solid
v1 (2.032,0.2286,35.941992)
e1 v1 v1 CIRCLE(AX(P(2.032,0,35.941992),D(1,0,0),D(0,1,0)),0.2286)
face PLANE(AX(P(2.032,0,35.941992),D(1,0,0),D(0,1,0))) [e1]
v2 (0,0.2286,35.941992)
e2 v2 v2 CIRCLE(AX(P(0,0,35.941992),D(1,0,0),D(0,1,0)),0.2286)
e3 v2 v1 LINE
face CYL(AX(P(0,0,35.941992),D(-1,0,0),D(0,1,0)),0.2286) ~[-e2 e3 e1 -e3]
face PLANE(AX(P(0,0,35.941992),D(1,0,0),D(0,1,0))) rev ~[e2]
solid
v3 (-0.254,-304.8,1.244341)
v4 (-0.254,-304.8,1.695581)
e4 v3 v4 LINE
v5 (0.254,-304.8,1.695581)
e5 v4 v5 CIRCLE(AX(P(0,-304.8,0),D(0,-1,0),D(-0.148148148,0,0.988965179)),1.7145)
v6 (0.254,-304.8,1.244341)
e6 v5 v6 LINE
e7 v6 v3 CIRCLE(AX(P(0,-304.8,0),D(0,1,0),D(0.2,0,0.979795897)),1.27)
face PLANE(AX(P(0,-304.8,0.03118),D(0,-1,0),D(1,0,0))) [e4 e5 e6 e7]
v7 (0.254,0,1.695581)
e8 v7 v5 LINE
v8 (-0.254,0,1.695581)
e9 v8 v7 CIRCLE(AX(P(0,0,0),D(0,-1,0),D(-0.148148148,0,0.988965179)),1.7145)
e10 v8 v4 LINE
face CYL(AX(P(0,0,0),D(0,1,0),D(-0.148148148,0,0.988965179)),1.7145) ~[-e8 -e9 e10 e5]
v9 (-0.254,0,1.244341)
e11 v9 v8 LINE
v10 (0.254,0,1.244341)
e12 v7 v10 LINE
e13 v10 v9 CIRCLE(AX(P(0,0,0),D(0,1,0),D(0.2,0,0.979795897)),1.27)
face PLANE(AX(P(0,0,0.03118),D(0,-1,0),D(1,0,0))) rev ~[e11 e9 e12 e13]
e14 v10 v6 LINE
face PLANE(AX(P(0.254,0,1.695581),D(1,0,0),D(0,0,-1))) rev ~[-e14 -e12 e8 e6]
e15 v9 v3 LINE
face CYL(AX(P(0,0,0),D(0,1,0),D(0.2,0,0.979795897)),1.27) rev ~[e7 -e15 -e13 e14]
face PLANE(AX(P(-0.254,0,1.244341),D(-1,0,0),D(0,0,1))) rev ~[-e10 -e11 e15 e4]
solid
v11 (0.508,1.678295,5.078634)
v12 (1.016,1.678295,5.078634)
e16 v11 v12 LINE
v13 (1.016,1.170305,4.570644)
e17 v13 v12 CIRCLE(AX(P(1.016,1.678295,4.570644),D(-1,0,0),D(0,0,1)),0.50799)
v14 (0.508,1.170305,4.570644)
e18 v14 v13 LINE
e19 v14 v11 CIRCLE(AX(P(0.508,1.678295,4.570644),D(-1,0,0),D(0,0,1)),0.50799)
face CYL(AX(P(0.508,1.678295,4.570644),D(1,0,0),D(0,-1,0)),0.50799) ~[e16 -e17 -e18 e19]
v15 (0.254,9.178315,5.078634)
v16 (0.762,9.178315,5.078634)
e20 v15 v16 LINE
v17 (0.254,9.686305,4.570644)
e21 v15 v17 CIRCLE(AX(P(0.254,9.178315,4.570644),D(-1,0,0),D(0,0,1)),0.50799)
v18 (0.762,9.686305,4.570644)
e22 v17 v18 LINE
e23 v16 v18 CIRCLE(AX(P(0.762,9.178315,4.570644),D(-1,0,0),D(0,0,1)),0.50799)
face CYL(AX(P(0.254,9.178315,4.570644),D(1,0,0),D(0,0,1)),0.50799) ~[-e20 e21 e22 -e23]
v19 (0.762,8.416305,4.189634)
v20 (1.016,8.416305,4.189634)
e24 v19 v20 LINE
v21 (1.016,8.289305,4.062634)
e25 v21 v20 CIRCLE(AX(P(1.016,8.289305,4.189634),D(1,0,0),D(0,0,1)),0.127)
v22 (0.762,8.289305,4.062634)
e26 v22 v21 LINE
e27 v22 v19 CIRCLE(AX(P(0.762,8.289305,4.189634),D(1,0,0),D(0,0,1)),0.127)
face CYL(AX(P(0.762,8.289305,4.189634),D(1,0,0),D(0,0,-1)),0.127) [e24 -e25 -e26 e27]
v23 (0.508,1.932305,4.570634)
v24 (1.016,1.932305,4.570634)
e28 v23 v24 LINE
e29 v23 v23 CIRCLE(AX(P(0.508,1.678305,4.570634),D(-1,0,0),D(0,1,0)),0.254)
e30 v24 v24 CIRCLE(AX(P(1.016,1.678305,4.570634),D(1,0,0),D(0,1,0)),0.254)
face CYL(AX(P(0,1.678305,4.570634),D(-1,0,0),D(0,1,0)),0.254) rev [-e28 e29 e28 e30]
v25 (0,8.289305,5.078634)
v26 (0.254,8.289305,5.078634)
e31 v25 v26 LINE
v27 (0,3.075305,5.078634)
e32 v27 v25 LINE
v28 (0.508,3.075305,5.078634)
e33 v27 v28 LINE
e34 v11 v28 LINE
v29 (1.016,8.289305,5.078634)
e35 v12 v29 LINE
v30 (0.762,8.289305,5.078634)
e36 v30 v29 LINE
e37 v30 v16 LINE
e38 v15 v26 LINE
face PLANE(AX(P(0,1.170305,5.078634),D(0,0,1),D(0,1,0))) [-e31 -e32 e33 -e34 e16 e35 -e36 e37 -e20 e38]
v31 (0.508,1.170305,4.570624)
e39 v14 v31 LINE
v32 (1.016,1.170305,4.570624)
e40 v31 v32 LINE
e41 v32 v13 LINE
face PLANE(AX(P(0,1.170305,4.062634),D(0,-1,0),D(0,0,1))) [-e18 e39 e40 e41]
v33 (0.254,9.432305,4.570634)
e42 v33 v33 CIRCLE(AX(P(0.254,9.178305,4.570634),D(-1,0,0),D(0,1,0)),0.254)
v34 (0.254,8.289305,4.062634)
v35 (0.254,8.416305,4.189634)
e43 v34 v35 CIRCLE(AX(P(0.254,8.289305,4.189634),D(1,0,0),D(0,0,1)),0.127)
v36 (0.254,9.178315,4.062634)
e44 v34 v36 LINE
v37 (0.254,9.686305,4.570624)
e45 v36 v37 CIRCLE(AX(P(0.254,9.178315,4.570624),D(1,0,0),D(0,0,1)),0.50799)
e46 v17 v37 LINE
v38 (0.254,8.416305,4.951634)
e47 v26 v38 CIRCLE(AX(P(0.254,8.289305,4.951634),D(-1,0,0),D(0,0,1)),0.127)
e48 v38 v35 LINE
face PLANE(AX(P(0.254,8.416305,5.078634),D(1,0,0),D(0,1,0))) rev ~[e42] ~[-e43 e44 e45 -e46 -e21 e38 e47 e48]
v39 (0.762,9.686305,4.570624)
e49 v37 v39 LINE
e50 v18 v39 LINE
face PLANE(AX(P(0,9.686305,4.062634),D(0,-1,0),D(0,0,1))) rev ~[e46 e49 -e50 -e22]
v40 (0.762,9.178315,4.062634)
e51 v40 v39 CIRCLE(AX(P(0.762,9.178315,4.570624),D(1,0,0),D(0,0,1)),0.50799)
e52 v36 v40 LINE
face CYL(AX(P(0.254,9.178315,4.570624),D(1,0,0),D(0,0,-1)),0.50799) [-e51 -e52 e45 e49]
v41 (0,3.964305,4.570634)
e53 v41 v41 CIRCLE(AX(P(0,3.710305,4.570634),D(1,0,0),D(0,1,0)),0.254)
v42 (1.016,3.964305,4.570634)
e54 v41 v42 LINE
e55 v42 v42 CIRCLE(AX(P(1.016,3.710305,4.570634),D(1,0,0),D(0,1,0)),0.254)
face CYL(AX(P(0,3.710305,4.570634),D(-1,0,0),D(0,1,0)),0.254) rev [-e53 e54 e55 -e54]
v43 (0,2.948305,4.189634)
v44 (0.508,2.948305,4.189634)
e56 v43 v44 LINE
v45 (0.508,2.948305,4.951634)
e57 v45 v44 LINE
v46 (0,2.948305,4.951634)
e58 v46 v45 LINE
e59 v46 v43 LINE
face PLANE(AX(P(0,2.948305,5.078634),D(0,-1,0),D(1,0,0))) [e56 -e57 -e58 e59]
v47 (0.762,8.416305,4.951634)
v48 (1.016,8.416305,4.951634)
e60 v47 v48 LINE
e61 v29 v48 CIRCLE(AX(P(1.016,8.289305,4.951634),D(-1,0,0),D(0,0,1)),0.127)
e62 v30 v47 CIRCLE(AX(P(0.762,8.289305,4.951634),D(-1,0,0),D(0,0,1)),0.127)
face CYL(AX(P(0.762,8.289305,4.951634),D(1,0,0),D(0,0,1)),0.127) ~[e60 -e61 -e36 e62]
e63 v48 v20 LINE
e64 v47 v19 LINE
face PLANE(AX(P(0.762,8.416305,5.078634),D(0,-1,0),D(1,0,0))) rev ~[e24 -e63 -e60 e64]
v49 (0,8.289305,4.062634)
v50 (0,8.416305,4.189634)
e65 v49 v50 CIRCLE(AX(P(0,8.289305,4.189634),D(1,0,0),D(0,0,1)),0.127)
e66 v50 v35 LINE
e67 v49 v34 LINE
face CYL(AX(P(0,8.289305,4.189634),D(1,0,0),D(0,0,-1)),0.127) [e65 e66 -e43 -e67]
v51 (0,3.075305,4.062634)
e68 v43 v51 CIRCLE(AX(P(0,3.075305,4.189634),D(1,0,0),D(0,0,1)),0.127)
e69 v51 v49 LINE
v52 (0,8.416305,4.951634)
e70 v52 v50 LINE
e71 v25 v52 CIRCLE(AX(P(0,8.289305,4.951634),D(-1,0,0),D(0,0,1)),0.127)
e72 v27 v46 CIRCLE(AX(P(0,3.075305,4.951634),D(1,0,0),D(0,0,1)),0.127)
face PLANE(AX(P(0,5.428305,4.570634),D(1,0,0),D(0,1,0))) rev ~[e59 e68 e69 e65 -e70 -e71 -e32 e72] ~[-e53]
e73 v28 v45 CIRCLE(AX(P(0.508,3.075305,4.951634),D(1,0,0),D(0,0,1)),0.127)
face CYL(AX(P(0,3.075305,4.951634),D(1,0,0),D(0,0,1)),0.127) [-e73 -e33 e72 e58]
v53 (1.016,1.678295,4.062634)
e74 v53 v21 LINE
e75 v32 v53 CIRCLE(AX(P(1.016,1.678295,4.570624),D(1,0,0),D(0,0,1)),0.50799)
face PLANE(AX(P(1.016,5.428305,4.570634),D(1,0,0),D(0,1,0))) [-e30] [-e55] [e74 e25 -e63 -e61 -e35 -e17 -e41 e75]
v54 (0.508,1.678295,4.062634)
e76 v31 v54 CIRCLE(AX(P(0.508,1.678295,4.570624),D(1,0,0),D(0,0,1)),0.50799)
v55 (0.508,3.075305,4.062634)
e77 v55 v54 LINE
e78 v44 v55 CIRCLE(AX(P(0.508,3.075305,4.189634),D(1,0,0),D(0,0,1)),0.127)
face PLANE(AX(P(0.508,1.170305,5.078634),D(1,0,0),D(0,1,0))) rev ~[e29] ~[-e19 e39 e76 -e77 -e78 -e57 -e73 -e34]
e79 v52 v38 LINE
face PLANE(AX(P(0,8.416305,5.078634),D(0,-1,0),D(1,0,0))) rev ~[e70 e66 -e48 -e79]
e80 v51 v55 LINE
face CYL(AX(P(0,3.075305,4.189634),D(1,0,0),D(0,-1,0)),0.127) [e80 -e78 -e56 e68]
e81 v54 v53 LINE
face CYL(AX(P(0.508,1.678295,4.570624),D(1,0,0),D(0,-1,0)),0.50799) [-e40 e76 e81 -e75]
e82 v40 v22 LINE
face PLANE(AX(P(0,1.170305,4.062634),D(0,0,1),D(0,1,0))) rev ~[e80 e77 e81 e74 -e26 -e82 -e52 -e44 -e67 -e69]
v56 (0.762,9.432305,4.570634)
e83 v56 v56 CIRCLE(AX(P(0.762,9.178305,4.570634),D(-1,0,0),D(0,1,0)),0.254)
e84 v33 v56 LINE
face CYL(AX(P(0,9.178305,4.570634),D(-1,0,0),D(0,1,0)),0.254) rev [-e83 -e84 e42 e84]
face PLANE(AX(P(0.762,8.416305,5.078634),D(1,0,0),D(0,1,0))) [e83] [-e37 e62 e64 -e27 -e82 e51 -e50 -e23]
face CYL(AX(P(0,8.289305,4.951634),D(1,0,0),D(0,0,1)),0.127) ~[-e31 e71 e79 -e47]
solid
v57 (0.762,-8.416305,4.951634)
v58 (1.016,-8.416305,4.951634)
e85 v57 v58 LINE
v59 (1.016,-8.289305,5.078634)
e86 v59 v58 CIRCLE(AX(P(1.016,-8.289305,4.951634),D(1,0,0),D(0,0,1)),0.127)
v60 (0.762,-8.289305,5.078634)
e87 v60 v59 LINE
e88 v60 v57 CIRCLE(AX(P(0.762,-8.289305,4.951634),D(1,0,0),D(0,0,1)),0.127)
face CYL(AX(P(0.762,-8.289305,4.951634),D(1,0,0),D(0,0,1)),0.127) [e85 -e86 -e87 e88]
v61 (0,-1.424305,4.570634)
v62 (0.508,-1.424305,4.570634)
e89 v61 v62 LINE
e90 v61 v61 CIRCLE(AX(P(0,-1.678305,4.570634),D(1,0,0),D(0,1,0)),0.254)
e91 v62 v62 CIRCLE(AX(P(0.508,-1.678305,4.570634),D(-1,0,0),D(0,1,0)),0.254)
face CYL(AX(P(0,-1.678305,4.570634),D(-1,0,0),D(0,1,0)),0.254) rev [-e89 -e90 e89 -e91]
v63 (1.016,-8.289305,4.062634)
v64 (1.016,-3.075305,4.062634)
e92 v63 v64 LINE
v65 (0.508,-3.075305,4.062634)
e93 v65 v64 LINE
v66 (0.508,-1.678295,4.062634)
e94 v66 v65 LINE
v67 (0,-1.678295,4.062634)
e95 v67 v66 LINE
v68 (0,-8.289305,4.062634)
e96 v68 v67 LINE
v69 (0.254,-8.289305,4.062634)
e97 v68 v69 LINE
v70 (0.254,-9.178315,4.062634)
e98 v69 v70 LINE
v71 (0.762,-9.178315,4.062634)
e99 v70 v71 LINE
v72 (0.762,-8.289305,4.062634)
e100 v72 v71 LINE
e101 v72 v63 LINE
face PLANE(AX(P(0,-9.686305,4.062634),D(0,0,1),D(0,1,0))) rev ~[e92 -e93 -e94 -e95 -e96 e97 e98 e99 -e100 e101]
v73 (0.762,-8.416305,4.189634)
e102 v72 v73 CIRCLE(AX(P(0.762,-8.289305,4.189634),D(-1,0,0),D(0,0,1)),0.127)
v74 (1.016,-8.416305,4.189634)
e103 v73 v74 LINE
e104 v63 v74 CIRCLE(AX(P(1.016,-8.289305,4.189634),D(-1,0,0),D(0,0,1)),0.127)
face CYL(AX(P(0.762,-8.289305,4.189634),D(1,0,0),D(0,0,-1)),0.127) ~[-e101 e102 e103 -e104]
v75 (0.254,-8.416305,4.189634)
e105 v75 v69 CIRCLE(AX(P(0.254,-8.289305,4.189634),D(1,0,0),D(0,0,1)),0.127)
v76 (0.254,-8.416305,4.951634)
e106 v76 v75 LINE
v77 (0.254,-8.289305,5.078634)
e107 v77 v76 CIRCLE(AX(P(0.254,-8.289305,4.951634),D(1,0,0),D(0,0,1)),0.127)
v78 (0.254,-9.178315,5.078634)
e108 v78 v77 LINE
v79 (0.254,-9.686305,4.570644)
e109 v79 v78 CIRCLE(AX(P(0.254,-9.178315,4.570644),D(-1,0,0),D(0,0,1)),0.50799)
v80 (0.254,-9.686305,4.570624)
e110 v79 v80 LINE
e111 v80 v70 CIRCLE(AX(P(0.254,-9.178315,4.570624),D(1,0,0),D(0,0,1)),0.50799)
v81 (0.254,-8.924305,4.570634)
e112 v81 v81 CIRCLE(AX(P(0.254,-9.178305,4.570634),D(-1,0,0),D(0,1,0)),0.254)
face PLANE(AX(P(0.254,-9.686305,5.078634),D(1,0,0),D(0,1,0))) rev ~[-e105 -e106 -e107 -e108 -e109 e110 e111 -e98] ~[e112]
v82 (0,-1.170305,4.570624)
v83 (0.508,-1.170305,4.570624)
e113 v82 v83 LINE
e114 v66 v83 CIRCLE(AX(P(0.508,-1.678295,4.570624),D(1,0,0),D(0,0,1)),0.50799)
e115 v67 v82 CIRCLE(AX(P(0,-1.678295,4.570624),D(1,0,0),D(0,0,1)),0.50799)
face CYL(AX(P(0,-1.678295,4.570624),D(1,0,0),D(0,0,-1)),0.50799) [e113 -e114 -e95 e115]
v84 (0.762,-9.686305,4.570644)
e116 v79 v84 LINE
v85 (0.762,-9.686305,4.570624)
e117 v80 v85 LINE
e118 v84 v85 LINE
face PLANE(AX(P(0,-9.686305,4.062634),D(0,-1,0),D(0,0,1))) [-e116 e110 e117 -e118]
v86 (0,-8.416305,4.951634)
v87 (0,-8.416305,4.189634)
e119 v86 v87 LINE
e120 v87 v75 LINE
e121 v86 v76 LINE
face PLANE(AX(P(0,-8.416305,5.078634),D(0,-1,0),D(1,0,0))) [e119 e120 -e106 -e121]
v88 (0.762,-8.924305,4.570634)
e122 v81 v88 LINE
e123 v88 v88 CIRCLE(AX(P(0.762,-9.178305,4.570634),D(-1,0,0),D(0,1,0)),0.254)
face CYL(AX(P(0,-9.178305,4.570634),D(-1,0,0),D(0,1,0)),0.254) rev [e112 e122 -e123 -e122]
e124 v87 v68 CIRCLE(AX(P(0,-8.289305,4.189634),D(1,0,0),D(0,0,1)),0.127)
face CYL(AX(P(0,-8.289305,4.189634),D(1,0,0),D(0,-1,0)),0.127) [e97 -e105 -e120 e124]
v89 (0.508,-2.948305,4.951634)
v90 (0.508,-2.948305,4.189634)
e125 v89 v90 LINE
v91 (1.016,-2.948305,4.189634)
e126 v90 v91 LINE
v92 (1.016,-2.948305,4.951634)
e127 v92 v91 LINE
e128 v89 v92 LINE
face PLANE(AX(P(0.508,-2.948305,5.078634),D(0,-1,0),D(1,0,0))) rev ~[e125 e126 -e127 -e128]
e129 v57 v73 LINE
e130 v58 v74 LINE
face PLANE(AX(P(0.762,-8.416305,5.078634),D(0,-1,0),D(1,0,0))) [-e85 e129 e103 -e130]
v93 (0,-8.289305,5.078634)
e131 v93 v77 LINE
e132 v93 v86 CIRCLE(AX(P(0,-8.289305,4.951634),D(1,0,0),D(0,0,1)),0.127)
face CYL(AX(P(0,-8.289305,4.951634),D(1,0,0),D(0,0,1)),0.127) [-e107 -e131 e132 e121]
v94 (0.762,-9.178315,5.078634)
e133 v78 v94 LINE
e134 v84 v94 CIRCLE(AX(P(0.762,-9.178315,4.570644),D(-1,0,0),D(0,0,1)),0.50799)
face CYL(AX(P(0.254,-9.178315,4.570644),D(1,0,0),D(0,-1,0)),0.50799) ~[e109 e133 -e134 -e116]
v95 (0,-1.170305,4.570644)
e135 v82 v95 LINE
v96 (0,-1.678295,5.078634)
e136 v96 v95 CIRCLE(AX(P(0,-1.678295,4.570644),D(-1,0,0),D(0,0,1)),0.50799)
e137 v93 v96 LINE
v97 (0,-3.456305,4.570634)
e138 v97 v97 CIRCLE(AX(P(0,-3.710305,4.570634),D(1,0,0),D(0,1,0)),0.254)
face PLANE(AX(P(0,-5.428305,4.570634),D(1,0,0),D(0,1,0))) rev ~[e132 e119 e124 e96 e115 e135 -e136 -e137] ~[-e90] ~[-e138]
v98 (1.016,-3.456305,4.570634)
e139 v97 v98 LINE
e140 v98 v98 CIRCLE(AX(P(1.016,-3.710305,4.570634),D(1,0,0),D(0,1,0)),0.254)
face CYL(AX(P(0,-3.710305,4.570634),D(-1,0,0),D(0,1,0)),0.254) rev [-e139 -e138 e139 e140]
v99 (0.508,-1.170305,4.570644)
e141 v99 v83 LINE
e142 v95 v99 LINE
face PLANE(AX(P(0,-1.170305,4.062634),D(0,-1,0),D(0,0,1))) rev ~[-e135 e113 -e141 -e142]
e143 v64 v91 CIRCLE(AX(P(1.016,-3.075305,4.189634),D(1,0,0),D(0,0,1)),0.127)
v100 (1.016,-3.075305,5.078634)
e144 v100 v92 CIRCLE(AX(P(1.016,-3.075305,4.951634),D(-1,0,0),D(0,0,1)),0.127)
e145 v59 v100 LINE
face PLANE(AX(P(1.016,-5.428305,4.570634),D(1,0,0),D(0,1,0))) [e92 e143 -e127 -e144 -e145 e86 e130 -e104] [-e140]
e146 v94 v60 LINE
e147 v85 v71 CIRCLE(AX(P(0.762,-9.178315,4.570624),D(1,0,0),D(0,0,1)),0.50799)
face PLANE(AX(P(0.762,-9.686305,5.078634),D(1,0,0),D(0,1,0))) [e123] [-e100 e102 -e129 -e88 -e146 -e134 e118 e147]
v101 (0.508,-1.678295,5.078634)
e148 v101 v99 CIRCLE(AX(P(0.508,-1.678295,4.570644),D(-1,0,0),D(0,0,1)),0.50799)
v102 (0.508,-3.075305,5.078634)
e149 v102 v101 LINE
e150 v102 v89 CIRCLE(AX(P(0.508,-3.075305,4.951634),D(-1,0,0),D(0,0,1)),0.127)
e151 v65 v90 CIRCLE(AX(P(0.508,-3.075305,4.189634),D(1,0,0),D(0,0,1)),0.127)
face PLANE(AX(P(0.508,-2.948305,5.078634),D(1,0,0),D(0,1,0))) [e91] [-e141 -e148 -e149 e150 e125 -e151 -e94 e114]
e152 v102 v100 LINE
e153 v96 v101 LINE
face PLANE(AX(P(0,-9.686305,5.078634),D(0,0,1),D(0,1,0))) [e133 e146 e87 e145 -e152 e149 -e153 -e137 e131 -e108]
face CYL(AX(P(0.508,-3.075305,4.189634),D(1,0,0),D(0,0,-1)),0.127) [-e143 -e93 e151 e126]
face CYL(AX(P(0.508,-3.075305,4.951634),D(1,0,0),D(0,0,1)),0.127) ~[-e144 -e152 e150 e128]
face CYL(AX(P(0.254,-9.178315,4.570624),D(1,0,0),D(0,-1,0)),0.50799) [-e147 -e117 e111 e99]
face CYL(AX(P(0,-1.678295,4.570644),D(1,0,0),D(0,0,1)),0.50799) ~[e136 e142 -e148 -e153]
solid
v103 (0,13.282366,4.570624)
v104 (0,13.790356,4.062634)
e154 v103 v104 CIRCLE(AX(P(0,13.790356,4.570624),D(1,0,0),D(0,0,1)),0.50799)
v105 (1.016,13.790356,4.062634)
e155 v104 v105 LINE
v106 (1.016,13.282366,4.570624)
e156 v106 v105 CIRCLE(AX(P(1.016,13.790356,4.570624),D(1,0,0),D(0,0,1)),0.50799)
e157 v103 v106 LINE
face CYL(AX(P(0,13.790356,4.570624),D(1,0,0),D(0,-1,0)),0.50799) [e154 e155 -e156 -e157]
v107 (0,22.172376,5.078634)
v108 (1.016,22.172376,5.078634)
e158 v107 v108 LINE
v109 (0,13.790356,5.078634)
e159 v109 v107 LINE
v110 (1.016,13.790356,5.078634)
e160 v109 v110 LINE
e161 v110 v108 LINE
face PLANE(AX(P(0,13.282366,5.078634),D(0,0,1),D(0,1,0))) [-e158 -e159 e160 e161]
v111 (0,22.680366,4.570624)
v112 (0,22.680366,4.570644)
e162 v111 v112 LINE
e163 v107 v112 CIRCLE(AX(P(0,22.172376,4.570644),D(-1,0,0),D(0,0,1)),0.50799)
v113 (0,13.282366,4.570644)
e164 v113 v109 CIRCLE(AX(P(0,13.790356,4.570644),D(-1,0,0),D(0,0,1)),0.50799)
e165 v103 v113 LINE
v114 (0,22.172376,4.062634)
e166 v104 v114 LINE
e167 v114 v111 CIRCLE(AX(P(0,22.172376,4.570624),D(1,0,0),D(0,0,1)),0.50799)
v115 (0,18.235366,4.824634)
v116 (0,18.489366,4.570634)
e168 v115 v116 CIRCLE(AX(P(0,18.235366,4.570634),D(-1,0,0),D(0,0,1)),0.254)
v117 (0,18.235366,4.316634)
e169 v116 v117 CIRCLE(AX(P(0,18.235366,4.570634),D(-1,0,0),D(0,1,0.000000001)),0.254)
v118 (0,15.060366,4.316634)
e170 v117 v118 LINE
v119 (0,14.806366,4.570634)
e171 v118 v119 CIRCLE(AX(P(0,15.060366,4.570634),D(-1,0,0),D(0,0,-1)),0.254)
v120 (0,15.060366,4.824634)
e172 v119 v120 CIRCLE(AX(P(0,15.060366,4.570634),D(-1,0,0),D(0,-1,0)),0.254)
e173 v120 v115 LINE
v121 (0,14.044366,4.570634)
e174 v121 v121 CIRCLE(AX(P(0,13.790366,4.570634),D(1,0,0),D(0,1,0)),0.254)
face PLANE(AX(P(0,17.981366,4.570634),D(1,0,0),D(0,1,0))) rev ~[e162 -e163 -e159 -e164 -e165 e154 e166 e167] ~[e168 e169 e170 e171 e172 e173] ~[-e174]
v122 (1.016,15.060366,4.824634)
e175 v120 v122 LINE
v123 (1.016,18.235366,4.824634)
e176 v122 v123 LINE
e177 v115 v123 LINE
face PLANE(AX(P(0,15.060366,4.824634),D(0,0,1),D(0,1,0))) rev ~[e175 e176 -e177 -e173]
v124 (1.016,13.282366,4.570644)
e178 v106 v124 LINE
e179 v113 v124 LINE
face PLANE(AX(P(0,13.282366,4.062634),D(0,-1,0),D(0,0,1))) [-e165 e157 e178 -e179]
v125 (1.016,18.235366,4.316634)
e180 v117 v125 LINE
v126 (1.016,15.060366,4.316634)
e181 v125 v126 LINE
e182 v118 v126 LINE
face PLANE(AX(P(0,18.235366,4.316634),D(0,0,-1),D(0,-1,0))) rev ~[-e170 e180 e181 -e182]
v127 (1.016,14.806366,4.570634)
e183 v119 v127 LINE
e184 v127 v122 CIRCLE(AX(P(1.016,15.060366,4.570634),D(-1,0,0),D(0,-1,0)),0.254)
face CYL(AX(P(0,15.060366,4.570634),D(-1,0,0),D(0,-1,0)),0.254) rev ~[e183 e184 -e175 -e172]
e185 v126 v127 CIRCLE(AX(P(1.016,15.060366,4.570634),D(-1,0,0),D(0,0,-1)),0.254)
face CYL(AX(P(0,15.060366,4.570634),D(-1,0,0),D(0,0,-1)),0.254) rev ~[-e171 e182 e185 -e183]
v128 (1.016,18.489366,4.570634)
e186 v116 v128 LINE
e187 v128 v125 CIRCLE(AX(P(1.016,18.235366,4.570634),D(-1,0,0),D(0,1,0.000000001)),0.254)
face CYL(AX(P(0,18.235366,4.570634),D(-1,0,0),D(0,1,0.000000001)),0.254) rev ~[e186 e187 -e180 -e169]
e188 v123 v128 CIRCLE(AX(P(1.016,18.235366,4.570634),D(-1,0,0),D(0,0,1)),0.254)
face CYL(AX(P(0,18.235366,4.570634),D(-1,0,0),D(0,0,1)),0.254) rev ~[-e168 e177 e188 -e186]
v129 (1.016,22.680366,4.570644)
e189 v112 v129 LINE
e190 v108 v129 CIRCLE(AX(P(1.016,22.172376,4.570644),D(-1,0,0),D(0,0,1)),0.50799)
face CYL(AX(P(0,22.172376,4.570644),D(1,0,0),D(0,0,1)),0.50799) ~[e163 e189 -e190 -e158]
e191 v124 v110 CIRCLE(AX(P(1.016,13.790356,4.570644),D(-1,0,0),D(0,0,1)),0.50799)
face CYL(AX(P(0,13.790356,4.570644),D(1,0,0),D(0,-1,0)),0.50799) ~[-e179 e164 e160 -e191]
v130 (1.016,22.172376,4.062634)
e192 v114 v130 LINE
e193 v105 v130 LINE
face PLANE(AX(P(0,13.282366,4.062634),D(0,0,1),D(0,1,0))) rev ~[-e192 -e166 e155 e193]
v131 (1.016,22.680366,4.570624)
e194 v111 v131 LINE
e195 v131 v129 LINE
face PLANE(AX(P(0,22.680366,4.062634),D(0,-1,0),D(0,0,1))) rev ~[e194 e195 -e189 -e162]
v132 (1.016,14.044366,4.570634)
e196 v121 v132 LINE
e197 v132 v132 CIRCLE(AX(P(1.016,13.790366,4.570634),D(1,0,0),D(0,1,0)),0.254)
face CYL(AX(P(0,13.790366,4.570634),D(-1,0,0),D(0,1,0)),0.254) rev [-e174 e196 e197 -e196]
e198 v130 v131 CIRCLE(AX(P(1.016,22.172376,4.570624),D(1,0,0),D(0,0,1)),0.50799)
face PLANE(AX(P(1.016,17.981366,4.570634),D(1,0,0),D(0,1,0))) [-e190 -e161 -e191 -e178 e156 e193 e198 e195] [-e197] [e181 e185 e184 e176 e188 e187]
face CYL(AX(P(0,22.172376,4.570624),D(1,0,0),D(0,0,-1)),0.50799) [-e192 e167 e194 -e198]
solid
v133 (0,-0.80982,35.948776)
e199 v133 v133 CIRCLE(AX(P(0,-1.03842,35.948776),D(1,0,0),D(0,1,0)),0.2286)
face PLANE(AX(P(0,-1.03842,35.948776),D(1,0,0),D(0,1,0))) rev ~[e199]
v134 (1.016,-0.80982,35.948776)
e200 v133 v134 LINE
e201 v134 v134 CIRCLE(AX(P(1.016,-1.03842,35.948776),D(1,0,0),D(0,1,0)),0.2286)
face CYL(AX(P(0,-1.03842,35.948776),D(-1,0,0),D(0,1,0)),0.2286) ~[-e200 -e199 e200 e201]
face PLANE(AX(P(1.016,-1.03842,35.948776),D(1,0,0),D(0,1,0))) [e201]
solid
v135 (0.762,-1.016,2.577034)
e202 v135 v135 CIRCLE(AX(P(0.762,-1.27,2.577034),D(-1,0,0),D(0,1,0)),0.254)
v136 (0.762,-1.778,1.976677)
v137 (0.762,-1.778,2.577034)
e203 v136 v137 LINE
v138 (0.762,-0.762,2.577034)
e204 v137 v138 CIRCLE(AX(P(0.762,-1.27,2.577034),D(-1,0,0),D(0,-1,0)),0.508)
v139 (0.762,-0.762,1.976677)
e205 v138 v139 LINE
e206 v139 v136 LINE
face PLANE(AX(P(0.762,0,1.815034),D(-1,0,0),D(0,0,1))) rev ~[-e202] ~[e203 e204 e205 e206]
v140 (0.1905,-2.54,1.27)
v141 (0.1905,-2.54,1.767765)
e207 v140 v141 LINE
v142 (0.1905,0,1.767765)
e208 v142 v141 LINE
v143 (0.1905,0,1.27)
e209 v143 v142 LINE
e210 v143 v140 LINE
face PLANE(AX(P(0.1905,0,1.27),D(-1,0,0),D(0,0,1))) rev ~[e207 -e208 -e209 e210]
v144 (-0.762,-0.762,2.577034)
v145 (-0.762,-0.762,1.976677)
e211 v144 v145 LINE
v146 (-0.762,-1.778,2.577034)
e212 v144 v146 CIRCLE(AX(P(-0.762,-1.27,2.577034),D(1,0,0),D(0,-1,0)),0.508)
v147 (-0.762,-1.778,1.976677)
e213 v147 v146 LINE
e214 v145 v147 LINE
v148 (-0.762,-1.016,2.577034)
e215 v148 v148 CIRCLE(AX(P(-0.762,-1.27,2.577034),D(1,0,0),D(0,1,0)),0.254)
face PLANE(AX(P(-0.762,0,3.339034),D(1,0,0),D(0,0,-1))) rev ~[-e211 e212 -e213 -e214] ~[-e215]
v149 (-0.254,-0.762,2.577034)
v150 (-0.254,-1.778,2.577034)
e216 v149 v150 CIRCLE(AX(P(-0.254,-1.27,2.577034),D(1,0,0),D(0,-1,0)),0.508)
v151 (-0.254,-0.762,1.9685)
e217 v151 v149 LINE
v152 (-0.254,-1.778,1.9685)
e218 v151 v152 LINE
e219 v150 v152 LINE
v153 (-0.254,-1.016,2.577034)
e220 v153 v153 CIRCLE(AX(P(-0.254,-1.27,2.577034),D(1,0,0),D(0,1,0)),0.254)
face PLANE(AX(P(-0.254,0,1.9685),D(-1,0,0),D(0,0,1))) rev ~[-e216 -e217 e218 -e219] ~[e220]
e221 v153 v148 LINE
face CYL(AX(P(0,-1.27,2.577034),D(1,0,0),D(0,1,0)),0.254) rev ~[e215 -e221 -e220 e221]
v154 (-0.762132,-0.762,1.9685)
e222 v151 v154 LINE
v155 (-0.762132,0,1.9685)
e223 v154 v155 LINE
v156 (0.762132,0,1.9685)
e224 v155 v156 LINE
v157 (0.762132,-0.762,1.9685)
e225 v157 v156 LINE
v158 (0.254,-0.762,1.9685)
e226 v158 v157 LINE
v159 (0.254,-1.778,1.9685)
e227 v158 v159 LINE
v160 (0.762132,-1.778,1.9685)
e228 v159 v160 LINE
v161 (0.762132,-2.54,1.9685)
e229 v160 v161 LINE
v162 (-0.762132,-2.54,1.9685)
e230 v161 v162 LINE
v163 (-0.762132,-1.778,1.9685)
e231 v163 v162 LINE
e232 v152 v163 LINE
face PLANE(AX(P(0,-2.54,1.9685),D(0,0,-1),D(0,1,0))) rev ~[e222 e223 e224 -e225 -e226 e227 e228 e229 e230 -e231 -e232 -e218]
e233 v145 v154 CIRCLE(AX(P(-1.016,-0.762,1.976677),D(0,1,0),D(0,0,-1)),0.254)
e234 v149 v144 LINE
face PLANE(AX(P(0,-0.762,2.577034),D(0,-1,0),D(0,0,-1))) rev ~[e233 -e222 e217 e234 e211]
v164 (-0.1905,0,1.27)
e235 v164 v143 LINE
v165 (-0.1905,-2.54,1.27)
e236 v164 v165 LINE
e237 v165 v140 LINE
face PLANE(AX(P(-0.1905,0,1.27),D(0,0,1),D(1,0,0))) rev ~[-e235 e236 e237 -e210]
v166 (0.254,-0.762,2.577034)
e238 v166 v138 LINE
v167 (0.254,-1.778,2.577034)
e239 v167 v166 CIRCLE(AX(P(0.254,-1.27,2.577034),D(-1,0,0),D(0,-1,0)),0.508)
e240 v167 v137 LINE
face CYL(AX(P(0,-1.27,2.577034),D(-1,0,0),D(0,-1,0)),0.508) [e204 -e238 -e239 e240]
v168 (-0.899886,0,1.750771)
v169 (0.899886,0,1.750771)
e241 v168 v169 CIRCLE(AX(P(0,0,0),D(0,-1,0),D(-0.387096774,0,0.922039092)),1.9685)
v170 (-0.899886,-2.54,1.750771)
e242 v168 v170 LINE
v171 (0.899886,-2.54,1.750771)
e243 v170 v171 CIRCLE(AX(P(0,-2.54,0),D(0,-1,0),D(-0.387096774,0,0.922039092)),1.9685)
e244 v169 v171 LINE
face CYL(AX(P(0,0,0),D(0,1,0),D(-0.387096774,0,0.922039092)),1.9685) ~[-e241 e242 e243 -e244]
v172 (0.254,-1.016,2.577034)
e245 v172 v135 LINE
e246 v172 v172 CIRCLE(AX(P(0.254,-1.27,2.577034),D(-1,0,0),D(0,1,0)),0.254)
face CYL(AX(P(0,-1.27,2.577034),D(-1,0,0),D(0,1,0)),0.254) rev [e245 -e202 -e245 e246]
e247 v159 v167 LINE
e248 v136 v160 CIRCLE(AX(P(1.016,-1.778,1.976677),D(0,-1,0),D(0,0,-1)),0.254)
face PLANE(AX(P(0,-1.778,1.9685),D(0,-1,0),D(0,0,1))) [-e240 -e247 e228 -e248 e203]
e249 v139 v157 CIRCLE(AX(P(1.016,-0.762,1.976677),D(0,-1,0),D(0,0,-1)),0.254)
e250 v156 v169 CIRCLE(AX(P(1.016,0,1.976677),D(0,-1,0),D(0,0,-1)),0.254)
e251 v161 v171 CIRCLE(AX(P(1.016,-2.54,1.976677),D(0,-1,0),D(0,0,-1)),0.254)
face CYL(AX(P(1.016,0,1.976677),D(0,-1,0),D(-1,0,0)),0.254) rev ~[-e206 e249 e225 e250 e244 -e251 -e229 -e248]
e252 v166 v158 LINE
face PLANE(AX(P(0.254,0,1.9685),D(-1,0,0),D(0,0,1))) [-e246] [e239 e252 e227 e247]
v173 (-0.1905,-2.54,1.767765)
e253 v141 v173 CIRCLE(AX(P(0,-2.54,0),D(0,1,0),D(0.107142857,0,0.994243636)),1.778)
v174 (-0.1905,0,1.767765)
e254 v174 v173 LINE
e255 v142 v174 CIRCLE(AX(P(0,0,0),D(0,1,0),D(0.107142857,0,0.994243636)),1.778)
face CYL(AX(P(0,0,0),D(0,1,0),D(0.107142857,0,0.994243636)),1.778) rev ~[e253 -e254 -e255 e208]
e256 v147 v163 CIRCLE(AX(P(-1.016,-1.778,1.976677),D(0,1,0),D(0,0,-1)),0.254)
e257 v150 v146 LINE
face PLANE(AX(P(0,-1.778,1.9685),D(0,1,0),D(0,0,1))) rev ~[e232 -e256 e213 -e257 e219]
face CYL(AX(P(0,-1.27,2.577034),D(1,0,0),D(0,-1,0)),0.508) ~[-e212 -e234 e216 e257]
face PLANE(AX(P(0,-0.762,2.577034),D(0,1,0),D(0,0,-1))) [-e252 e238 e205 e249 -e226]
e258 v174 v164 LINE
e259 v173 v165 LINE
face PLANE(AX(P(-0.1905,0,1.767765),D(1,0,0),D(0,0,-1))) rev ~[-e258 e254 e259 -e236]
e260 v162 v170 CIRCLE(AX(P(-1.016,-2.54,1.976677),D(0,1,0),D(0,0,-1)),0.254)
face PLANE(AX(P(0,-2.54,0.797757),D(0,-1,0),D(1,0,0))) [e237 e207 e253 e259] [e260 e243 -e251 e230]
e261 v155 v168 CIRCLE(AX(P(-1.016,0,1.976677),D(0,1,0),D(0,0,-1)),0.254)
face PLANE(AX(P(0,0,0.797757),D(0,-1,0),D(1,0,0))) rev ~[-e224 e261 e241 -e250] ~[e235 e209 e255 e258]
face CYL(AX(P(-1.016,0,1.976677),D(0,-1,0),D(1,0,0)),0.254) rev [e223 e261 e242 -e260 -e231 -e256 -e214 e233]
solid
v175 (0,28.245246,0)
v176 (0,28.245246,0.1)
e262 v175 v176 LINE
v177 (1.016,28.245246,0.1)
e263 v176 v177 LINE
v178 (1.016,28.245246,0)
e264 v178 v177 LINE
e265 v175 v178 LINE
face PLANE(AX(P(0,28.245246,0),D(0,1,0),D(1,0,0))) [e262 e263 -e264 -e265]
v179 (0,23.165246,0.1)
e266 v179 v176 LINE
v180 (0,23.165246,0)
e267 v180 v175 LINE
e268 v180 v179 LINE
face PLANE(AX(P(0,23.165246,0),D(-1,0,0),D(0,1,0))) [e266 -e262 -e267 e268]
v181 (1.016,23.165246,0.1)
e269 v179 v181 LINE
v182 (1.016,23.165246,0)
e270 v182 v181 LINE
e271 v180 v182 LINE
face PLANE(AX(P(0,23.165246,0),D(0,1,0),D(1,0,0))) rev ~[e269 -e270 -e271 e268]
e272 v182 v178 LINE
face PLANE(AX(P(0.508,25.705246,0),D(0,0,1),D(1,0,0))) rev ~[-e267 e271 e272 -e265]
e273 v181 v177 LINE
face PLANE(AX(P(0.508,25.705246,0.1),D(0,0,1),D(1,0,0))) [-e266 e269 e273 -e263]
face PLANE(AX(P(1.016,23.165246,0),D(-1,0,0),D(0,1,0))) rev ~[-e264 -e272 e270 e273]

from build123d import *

# Parameters (mm, degrees)
F0_W           = 8.516
F0_H           = 1.016
F0_R           = 0.254
F1_DEPTH       = 1.016
F0_W_2         = 9.398
F2_W           = 0.254
F2_H           = 1.27
F2_W_2         = 0.508
F2_H_2         = 1.778
F3_DEPTH       = 1.017
F4_R           = 0.50799
F4_2_R         = 0.50799
F4_3_R         = 0.50799
F5_R           = 0.127
F5_2_R         = 0.127
F7_DEPTH       = 304.8
F9_DEPTH       = 2.54
F10_W          = 0.508
F10_H          = 1.524
F11_DEPTH      = 304.801
F12_R          = 0.254
F13_DEPTH      = 1.9695
F13_DEPTH_BACK = 1.9695
F14_R          = 0.254
F15_R          = 0.2286
F16_DEPTH      = 2.032
F17_R          = 0.2286
F18_DEPTH      = 1.016
F19_W          = 1.016
F19_H          = 5.08
F20_DEPTH      = 0.1


# Not quite as in the source:
# - a fillet or chamfer is up to 0.001 mm smaller than in the source, because OpenCascade refuses the exact size


with BuildPart() as f1:
    # F0 (on Right) → F1 (new body)
    with BuildSketch(Plane.YZ):
        with Locations((-5.428305112, 4.5706343557)):
            Rectangle(F0_W, F0_H)
        with Locations((-9.178305112, 4.5706343557)):
            Circle(F0_R, mode=Mode.SUBTRACT)
        with Locations((-3.710305112, 4.5706343557)):
            Circle(F0_R, mode=Mode.SUBTRACT)
        with Locations((-1.678305112, 4.5706343557)):
            Circle(F0_R, mode=Mode.SUBTRACT)
    extrude(amount=F1_DEPTH)


with BuildPart() as f1b:
    # F0 (on Right) → F1, piece 2 (new body)
    with BuildSketch(Plane.YZ):
        with Locations((5.428305112, 4.5706343557)):
            Rectangle(F0_W, F0_H)
        with Locations((1.678305112, 4.5706343557)):
            Circle(F0_R, mode=Mode.SUBTRACT)
        with Locations((3.710305112, 4.5706343557)):
            Circle(F0_R, mode=Mode.SUBTRACT)
        with Locations((9.178305112, 4.5706343557)):
            Circle(F0_R, mode=Mode.SUBTRACT)
    extrude(amount=F1_DEPTH)


with BuildPart() as f1c:
    # F0 (on Right) → F1, piece 3 (new body)
    with BuildSketch(Plane.YZ):
        with Locations((17.9813661472, 4.5706343557)):
            Rectangle(F0_W_2, F0_H)
        with Locations((13.7903661472, 4.5706343557)):
            Circle(F0_R, mode=Mode.SUBTRACT)
        with BuildLine():
            ThreePointArc((14.8063661472, 4.5706343557), (14.8807610248, 4.7502394781), (15.0603661472, 4.8246343557))
            Line((15.0603661472, 4.8246343557), (18.2353661472, 4.8246343557))
            ThreePointArc((18.2353661472, 4.8246343557), (18.4149712697, 4.7502394781), (18.4893661472, 4.5706343557))
            ThreePointArc((18.4893661472, 4.5706343557), (18.4149712697, 4.3910292332), (18.2353661472, 4.3166343557))
            Line((18.2353661472, 4.3166343557), (15.0603661472, 4.3166343557))
            ThreePointArc((15.0603661472, 4.3166343557), (14.8807610248, 4.3910292332), (14.8063661472, 4.5706343557))
        make_face(mode=Mode.SUBTRACT)
    extrude(amount=F1_DEPTH)

    # F4#3 (radius 0.508 in the source; OpenCascade refuses exactly that, so slightly less here)
    f4_3_edges = [f1c.edges().sort_by_distance(p)[0] for p in [
        (0.508, 13.282366, 5.078634),
        (0.508, 13.282366, 4.062634),
        (0.508, 22.680366, 5.078634),
        (0.508, 22.680366, 4.062634),
    ]]
    fillet(f4_3_edges, radius=F4_3_R)


with BuildPart() as f3_tool:
    # F2 (on face) → F3 (new body, through all)
    with BuildSketch(Plane.XY.offset(5.0786343557)):
        with Locations((0.127, -9.051305112)):
            Rectangle(F2_W, F2_H)
        with Locations((0.889, -9.051305112)):
            Rectangle(F2_W, F2_H)
        with Locations((0.762, -2.059305112)):
            Rectangle(F2_W_2, F2_H_2)
        with Locations((0.254, 2.059305112)):
            Rectangle(F2_W_2, F2_H_2)
        with Locations((0.127, 9.051305112)):
            Rectangle(F2_W, F2_H)
        with Locations((0.889, 9.051305112)):
            Rectangle(F2_W, F2_H)
    extrude(amount=-F3_DEPTH)


with BuildPart() as f1_1:
    add(f1.part)

    # F3: cut by f3_tool
    add(f3_tool.part, mode=Mode.SUBTRACT)

    # F4 (radius 0.508 in the source; OpenCascade refuses exactly that, so slightly less here)
    f4_edges = [f1_1.edges().sort_by_distance(p)[0] for p in [
        (0.508, -9.686305, 5.078634),
        (0.508, -9.686305, 4.062634),
        (0.254, -1.170305, 5.078634),
        (0.254, -1.170305, 4.062634),
    ]]
    fillet(f4_edges, radius=F4_R)

    # F5
    f5_edges = [f1_1.edges().sort_by_distance(p)[0] for p in [
        (0.762, -2.948305, 5.078634),
        (0.762, -2.948305, 4.062634),
        (0.127, -8.416305, 4.062634),
        (0.127, -8.416305, 5.078634),
        (0.889, -8.416305, 5.078634),
        (0.889, -8.416305, 4.062634),
    ]]
    fillet(f5_edges, radius=F5_R)


with BuildPart() as f1b_1:
    add(f1b.part)

    # F3: cut by f3_tool
    add(f3_tool.part, mode=Mode.SUBTRACT)

    # F4#2 (radius 0.508 in the source; OpenCascade refuses exactly that, so slightly less here)
    f4_2_edges = [f1b_1.edges().sort_by_distance(p)[0] for p in [
        (0.762, 1.170305, 5.078634),
        (0.762, 1.170305, 4.062634),
        (0.508, 9.686305, 5.078634),
        (0.508, 9.686305, 4.062634),
    ]]
    fillet(f4_2_edges, radius=F4_2_R)

    # F5#2
    f5_2_edges = [f1b_1.edges().sort_by_distance(p)[0] for p in [
        (0.254, 2.948305, 5.078634),
        (0.254, 2.948305, 4.062634),
        (0.127, 8.416305, 5.078634),
        (0.127, 8.416305, 4.062634),
        (0.889, 8.416305, 5.078634),
        (0.889, 8.416305, 4.062634),
    ]]
    fillet(f5_2_edges, radius=F5_2_R)


with BuildPart() as f7:
    # F6 (on Front) → F7 (new body)
    with BuildSketch(Plane.XZ):
        with BuildLine():
            Line((-0.254, 1.2443407893), (-0.254, 1.6955808002))
            ThreePointArc((-0.254, 1.6955808002), (0, -1.7145), (0.254, 1.6955808002))
            Line((0.254, 1.6955808002), (0.254, 1.2443407893))
            ThreePointArc((0.254, 1.2443407893), (0, -1.27), (-0.254, 1.2443407893))
        make_face()
    extrude(amount=F7_DEPTH)


with BuildPart() as f9:
    # F8 (on Front) → F9 (new body)
    with BuildSketch(Plane.XZ):
        with BuildLine():
            Line((-0.762, 3.3390339529), (-0.762, 1.8150339529))
            ThreePointArc((-0.762, 1.8150339529), (0, -1.9685), (0.762, 1.8150339529))
            Line((0.762, 1.8150339529), (0.762, 3.3390339529))
            Line((0.762, 3.3390339529), (0, 3.3390339529))
            Line((0, 3.3390339529), (-0.762, 3.3390339529))
        make_face()
        with BuildLine():
            ThreePointArc((0.1905, 1.7677651852), (0, -1.778), (-0.1905, 1.7677651852))
            Line((-0.1905, 1.7677651852), (-0.1905, 1.27))
            Line((-0.1905, 1.27), (0.1905, 1.27))
            Line((0.1905, 1.27), (0.1905, 1.7677651852))
        make_face(mode=Mode.SUBTRACT)
    extrude(amount=F9_DEPTH)

    # F10 (on Front) → F11 (cut, through all)
    with BuildSketch(Plane.XZ):
        with Locations((0, 2.7305)):
            Rectangle(F10_W, F10_H)
    extrude(amount=F11_DEPTH, mode=Mode.SUBTRACT)

    # F12 (on Right) → F13 (cut, two sides)
    with BuildSketch(Plane.YZ) as f13_sk:
        with Locations((-1.27, 2.5770339529)):
            Circle(F12_R)
        with BuildLine():
            Line((0, 1.9685), (0, 3.3390339529))
            Line((0, 3.3390339529), (-0.6516448254, 3.5353413116))
            Line((-0.6516448254, 3.5353413116), (-2.2018356164, 3.5353413116))
            Line((-2.2018356164, 3.5353413116), (-2.54, 3.3390339529))
            Line((-2.54, 3.3390339529), (-2.54, 1.9685))
            Line((-2.54, 1.9685), (-1.778, 1.9685))
            Line((-1.778, 1.9685), (-1.778, 2.5770339529))
            ThreePointArc((-1.778, 2.5770339529), (-1.27, 3.0850339529), (-0.762, 2.5770339529))
            Line((-0.762, 2.5770339529), (-0.762, 1.9685))
            Line((-0.762, 1.9685), (0, 1.9685))
        make_face()
    extrude(amount=-F13_DEPTH, mode=Mode.SUBTRACT)
    extrude(f13_sk.sketch, amount=F13_DEPTH_BACK, mode=Mode.SUBTRACT)

    # F14 (call 1 of 2: OpenCascade refuses the feature's edges together)
    f14_edges = [f9.edges().sort_by_distance(p)[0] for p in [
        (0.762, -1.27, 1.815034),
    ]]
    fillet(f14_edges, radius=F14_R)

    # F14#2 (call 2 of 2)
    f14_2_edges = [f9.edges().sort_by_distance(p)[0] for p in [
        (-0.762, -1.27, 1.815034),
    ]]
    fillet(f14_2_edges, radius=F14_R)


with BuildPart() as f16:
    # F15 (on Right) → F16 (new body)
    with BuildSketch(Plane.YZ):
        with Locations((0, 35.941991955)):
            Circle(F15_R)
    extrude(amount=F16_DEPTH)


with BuildPart() as f18:
    # F17 (on Right) → F18 (new body)
    with BuildSketch(Plane.YZ):
        with Locations((-1.0384203633, 35.9487757087)):
            Circle(F17_R)
    extrude(amount=F18_DEPTH)


with BuildPart() as f20:
    # F19 (on Top) → F20 (new body)
    with BuildSketch(Plane.XY):
        with Locations((0.508, 25.7052464718)):
            Rectangle(F19_W, F19_H)
    extrude(amount=F20_DEPTH)


solid = Compound([f1c.part, f1_1.part, f1b_1.part, f7.part, f9.part, f16.part, f18.part, f20.part])
